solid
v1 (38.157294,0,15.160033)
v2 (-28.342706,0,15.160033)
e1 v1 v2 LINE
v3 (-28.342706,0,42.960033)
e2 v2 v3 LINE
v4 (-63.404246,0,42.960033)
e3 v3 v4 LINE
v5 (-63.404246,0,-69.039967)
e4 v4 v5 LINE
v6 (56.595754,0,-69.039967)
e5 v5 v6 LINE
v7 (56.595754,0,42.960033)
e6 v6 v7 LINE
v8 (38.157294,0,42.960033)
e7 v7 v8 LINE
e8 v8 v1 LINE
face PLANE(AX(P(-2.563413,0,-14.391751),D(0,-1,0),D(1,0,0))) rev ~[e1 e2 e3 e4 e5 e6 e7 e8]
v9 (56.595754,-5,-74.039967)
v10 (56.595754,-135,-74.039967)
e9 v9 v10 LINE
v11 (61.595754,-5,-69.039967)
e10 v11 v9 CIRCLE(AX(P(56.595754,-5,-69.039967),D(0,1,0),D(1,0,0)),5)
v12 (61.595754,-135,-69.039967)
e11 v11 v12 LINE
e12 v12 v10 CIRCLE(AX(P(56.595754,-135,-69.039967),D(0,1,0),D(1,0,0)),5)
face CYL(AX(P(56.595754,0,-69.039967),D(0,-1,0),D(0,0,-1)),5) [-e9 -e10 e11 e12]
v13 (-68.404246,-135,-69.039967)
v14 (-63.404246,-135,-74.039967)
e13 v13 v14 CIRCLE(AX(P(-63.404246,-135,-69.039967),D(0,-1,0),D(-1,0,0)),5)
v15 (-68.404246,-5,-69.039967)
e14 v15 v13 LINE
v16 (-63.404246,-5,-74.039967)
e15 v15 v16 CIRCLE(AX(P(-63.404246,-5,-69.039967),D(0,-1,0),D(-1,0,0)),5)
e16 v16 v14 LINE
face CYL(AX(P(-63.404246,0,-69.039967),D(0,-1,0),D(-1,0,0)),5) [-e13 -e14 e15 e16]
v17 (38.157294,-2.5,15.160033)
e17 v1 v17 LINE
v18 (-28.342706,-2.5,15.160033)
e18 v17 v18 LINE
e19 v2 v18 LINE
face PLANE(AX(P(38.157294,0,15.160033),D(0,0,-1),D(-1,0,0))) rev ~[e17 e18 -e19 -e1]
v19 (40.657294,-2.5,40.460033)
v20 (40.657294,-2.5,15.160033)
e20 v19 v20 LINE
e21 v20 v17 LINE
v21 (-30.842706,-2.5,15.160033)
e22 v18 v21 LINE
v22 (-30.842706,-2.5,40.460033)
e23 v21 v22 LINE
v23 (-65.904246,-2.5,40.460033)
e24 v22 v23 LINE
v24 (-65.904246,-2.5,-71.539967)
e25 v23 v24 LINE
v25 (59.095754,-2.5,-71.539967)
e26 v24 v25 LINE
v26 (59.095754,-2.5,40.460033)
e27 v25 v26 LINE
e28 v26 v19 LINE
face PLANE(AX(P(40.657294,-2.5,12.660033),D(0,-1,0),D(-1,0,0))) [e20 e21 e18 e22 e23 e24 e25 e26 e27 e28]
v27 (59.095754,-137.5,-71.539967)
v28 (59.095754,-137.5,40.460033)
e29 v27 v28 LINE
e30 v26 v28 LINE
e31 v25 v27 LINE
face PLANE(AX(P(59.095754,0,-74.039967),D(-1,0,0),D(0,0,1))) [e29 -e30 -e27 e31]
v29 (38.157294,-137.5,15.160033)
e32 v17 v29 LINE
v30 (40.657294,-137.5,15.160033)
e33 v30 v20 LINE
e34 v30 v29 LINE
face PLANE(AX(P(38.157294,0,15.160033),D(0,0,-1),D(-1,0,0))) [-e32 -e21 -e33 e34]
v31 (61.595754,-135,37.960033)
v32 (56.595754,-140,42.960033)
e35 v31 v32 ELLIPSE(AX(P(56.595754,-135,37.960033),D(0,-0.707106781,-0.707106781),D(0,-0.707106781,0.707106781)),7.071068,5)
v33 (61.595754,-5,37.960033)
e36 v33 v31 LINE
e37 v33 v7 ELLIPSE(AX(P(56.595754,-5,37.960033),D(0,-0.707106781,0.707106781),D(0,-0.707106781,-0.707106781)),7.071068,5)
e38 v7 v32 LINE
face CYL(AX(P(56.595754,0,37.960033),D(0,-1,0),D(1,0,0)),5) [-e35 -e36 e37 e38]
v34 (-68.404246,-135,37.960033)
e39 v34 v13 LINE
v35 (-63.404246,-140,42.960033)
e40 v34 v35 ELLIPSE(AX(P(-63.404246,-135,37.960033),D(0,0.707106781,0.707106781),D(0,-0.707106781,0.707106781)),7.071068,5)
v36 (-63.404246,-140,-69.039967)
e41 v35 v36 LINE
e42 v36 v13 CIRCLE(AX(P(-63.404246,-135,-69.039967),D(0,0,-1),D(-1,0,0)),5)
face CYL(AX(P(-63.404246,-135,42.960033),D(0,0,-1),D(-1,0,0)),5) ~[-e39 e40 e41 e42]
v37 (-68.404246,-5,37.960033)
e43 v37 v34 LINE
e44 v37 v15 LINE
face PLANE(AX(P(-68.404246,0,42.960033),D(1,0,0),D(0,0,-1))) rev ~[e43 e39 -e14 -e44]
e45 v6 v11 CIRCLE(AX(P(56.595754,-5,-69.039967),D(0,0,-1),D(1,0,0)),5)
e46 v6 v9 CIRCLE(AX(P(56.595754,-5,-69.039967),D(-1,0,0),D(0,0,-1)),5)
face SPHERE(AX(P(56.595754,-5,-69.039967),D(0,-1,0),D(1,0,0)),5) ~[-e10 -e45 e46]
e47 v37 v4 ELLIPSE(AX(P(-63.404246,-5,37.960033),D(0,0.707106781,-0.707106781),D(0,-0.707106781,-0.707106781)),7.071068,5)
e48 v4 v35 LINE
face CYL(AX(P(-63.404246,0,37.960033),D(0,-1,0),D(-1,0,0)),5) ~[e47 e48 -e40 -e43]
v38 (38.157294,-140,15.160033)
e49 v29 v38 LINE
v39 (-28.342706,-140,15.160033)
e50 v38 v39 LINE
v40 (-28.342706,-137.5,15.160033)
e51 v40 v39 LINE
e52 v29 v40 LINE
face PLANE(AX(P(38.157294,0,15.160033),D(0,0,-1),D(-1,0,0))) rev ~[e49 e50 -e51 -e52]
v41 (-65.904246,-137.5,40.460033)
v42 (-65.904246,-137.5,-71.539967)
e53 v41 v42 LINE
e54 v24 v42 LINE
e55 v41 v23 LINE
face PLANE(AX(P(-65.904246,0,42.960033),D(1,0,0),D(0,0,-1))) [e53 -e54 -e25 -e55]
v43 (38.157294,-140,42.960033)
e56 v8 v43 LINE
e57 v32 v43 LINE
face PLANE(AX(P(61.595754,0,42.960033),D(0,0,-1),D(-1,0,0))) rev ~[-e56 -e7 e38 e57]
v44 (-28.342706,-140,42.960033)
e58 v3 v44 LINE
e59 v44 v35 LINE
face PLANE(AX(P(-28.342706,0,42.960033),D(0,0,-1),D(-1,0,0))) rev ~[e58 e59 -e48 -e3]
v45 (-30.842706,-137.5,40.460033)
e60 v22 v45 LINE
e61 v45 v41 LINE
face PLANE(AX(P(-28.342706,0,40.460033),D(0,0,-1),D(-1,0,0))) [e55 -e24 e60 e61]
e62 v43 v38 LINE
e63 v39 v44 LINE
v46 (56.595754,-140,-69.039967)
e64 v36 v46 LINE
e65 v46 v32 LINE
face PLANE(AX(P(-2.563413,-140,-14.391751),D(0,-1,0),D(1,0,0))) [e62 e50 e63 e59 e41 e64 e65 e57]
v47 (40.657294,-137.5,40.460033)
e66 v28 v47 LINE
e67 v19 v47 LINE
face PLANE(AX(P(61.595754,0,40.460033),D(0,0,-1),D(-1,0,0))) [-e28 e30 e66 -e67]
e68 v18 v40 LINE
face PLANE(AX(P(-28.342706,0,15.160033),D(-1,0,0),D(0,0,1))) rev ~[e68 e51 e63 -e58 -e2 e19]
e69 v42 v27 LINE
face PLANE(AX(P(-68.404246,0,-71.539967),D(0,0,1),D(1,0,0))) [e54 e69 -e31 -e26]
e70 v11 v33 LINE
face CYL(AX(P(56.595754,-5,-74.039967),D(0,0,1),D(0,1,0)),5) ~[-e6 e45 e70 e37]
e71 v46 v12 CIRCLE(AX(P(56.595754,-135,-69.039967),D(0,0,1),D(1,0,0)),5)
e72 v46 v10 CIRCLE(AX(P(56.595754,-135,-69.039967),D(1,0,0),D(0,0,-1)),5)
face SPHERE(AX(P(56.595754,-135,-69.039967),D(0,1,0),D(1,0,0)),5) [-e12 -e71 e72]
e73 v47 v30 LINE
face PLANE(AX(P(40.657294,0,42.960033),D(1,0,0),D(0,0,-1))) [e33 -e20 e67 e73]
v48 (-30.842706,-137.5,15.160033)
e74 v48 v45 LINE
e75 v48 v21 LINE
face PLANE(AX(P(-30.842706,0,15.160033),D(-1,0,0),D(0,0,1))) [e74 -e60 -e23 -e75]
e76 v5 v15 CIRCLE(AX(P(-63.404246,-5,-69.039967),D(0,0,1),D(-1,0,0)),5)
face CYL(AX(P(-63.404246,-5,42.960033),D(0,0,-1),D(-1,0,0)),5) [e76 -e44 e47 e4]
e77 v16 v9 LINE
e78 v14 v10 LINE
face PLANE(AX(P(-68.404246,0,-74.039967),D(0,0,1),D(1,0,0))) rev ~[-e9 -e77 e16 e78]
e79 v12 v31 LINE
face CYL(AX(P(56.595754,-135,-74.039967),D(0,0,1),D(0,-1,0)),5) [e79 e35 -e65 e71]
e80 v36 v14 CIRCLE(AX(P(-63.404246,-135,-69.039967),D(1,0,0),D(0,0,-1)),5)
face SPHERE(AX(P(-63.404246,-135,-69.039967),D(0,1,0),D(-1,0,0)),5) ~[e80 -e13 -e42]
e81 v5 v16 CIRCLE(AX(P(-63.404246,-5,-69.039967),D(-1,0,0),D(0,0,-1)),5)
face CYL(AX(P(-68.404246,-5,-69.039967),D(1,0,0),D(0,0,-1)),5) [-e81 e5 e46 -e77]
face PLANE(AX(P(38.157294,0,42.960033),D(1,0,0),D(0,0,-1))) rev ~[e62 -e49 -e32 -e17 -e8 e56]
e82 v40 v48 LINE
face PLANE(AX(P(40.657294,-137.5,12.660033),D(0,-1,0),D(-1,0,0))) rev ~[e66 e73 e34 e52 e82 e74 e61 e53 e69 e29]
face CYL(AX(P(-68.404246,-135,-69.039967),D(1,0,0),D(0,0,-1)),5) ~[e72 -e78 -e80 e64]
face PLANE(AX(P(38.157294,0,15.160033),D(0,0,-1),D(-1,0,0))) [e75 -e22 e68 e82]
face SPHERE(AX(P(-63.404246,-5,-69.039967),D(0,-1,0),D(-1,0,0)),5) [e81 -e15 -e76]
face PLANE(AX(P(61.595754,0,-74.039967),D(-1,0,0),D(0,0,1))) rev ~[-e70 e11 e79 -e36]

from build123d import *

# Parameters (mm, degrees)
F1_DEPTH = 140
F2_T     = -2.5
F3_R     = 5


# Not quite as in the source:
# - a shell that OpenCascade refuses in one call is made with other operations: the cavity is built on its own and cut out


with BuildPart() as f1:
    # F0 (on Front) → F1 (new body)
    with BuildSketch(Plane.XZ):
        Polygon((-68.4042458236, 42.9600325577), (-68.4042458236, -74.0399674423), (61.5957541764, -74.0399674423), (61.5957541764, 42.9600325577), (38.1572941835, 42.9600325577), (38.1572941835, 15.1600325577), (-28.3427058165, 15.1600325577), (-28.3427058165, 42.9600325577), align=None)
    extrude(amount=F1_DEPTH)

    # F2: a shell. OpenCascade refuses it in one call, so the cavity is built on its own and cut out:
    # the body offset inwards by the wall thickness, plus a prism from it out through each open face.
    f2_core = offset(f1.part, amount=F2_T, kind=Kind.INTERSECTION, mode=Mode.PRIVATE)
    f2_exits = [f2_core.faces().sort_by_distance(p)[0] for p in [
        (4.907294, -70, 12.660033),
    ]]
    add(f2_core, mode=Mode.SUBTRACT)
    extrude(f2_exits, amount=-F2_T, mode=Mode.SUBTRACT)

    # F3
    f3_edges = [f1.edges().sort_by_distance(p)[0] for p in [
        (-68.404246, -70, 42.960033),
        (-68.404246, -70, -74.039967),
        (-68.404246, 0, -15.539967),
        (-68.404246, -140, -15.539967),
        (61.595754, -70, -74.039967),
        (61.595754, -70, 42.960033),
        (61.595754, 0, -15.539967),
        (61.595754, -140, -15.539967),
        (-3.404246, 0, -74.039967),
        (-3.404246, -140, -74.039967),
    ]]
    fillet(f3_edges, radius=F3_R)


solid = f1.part
